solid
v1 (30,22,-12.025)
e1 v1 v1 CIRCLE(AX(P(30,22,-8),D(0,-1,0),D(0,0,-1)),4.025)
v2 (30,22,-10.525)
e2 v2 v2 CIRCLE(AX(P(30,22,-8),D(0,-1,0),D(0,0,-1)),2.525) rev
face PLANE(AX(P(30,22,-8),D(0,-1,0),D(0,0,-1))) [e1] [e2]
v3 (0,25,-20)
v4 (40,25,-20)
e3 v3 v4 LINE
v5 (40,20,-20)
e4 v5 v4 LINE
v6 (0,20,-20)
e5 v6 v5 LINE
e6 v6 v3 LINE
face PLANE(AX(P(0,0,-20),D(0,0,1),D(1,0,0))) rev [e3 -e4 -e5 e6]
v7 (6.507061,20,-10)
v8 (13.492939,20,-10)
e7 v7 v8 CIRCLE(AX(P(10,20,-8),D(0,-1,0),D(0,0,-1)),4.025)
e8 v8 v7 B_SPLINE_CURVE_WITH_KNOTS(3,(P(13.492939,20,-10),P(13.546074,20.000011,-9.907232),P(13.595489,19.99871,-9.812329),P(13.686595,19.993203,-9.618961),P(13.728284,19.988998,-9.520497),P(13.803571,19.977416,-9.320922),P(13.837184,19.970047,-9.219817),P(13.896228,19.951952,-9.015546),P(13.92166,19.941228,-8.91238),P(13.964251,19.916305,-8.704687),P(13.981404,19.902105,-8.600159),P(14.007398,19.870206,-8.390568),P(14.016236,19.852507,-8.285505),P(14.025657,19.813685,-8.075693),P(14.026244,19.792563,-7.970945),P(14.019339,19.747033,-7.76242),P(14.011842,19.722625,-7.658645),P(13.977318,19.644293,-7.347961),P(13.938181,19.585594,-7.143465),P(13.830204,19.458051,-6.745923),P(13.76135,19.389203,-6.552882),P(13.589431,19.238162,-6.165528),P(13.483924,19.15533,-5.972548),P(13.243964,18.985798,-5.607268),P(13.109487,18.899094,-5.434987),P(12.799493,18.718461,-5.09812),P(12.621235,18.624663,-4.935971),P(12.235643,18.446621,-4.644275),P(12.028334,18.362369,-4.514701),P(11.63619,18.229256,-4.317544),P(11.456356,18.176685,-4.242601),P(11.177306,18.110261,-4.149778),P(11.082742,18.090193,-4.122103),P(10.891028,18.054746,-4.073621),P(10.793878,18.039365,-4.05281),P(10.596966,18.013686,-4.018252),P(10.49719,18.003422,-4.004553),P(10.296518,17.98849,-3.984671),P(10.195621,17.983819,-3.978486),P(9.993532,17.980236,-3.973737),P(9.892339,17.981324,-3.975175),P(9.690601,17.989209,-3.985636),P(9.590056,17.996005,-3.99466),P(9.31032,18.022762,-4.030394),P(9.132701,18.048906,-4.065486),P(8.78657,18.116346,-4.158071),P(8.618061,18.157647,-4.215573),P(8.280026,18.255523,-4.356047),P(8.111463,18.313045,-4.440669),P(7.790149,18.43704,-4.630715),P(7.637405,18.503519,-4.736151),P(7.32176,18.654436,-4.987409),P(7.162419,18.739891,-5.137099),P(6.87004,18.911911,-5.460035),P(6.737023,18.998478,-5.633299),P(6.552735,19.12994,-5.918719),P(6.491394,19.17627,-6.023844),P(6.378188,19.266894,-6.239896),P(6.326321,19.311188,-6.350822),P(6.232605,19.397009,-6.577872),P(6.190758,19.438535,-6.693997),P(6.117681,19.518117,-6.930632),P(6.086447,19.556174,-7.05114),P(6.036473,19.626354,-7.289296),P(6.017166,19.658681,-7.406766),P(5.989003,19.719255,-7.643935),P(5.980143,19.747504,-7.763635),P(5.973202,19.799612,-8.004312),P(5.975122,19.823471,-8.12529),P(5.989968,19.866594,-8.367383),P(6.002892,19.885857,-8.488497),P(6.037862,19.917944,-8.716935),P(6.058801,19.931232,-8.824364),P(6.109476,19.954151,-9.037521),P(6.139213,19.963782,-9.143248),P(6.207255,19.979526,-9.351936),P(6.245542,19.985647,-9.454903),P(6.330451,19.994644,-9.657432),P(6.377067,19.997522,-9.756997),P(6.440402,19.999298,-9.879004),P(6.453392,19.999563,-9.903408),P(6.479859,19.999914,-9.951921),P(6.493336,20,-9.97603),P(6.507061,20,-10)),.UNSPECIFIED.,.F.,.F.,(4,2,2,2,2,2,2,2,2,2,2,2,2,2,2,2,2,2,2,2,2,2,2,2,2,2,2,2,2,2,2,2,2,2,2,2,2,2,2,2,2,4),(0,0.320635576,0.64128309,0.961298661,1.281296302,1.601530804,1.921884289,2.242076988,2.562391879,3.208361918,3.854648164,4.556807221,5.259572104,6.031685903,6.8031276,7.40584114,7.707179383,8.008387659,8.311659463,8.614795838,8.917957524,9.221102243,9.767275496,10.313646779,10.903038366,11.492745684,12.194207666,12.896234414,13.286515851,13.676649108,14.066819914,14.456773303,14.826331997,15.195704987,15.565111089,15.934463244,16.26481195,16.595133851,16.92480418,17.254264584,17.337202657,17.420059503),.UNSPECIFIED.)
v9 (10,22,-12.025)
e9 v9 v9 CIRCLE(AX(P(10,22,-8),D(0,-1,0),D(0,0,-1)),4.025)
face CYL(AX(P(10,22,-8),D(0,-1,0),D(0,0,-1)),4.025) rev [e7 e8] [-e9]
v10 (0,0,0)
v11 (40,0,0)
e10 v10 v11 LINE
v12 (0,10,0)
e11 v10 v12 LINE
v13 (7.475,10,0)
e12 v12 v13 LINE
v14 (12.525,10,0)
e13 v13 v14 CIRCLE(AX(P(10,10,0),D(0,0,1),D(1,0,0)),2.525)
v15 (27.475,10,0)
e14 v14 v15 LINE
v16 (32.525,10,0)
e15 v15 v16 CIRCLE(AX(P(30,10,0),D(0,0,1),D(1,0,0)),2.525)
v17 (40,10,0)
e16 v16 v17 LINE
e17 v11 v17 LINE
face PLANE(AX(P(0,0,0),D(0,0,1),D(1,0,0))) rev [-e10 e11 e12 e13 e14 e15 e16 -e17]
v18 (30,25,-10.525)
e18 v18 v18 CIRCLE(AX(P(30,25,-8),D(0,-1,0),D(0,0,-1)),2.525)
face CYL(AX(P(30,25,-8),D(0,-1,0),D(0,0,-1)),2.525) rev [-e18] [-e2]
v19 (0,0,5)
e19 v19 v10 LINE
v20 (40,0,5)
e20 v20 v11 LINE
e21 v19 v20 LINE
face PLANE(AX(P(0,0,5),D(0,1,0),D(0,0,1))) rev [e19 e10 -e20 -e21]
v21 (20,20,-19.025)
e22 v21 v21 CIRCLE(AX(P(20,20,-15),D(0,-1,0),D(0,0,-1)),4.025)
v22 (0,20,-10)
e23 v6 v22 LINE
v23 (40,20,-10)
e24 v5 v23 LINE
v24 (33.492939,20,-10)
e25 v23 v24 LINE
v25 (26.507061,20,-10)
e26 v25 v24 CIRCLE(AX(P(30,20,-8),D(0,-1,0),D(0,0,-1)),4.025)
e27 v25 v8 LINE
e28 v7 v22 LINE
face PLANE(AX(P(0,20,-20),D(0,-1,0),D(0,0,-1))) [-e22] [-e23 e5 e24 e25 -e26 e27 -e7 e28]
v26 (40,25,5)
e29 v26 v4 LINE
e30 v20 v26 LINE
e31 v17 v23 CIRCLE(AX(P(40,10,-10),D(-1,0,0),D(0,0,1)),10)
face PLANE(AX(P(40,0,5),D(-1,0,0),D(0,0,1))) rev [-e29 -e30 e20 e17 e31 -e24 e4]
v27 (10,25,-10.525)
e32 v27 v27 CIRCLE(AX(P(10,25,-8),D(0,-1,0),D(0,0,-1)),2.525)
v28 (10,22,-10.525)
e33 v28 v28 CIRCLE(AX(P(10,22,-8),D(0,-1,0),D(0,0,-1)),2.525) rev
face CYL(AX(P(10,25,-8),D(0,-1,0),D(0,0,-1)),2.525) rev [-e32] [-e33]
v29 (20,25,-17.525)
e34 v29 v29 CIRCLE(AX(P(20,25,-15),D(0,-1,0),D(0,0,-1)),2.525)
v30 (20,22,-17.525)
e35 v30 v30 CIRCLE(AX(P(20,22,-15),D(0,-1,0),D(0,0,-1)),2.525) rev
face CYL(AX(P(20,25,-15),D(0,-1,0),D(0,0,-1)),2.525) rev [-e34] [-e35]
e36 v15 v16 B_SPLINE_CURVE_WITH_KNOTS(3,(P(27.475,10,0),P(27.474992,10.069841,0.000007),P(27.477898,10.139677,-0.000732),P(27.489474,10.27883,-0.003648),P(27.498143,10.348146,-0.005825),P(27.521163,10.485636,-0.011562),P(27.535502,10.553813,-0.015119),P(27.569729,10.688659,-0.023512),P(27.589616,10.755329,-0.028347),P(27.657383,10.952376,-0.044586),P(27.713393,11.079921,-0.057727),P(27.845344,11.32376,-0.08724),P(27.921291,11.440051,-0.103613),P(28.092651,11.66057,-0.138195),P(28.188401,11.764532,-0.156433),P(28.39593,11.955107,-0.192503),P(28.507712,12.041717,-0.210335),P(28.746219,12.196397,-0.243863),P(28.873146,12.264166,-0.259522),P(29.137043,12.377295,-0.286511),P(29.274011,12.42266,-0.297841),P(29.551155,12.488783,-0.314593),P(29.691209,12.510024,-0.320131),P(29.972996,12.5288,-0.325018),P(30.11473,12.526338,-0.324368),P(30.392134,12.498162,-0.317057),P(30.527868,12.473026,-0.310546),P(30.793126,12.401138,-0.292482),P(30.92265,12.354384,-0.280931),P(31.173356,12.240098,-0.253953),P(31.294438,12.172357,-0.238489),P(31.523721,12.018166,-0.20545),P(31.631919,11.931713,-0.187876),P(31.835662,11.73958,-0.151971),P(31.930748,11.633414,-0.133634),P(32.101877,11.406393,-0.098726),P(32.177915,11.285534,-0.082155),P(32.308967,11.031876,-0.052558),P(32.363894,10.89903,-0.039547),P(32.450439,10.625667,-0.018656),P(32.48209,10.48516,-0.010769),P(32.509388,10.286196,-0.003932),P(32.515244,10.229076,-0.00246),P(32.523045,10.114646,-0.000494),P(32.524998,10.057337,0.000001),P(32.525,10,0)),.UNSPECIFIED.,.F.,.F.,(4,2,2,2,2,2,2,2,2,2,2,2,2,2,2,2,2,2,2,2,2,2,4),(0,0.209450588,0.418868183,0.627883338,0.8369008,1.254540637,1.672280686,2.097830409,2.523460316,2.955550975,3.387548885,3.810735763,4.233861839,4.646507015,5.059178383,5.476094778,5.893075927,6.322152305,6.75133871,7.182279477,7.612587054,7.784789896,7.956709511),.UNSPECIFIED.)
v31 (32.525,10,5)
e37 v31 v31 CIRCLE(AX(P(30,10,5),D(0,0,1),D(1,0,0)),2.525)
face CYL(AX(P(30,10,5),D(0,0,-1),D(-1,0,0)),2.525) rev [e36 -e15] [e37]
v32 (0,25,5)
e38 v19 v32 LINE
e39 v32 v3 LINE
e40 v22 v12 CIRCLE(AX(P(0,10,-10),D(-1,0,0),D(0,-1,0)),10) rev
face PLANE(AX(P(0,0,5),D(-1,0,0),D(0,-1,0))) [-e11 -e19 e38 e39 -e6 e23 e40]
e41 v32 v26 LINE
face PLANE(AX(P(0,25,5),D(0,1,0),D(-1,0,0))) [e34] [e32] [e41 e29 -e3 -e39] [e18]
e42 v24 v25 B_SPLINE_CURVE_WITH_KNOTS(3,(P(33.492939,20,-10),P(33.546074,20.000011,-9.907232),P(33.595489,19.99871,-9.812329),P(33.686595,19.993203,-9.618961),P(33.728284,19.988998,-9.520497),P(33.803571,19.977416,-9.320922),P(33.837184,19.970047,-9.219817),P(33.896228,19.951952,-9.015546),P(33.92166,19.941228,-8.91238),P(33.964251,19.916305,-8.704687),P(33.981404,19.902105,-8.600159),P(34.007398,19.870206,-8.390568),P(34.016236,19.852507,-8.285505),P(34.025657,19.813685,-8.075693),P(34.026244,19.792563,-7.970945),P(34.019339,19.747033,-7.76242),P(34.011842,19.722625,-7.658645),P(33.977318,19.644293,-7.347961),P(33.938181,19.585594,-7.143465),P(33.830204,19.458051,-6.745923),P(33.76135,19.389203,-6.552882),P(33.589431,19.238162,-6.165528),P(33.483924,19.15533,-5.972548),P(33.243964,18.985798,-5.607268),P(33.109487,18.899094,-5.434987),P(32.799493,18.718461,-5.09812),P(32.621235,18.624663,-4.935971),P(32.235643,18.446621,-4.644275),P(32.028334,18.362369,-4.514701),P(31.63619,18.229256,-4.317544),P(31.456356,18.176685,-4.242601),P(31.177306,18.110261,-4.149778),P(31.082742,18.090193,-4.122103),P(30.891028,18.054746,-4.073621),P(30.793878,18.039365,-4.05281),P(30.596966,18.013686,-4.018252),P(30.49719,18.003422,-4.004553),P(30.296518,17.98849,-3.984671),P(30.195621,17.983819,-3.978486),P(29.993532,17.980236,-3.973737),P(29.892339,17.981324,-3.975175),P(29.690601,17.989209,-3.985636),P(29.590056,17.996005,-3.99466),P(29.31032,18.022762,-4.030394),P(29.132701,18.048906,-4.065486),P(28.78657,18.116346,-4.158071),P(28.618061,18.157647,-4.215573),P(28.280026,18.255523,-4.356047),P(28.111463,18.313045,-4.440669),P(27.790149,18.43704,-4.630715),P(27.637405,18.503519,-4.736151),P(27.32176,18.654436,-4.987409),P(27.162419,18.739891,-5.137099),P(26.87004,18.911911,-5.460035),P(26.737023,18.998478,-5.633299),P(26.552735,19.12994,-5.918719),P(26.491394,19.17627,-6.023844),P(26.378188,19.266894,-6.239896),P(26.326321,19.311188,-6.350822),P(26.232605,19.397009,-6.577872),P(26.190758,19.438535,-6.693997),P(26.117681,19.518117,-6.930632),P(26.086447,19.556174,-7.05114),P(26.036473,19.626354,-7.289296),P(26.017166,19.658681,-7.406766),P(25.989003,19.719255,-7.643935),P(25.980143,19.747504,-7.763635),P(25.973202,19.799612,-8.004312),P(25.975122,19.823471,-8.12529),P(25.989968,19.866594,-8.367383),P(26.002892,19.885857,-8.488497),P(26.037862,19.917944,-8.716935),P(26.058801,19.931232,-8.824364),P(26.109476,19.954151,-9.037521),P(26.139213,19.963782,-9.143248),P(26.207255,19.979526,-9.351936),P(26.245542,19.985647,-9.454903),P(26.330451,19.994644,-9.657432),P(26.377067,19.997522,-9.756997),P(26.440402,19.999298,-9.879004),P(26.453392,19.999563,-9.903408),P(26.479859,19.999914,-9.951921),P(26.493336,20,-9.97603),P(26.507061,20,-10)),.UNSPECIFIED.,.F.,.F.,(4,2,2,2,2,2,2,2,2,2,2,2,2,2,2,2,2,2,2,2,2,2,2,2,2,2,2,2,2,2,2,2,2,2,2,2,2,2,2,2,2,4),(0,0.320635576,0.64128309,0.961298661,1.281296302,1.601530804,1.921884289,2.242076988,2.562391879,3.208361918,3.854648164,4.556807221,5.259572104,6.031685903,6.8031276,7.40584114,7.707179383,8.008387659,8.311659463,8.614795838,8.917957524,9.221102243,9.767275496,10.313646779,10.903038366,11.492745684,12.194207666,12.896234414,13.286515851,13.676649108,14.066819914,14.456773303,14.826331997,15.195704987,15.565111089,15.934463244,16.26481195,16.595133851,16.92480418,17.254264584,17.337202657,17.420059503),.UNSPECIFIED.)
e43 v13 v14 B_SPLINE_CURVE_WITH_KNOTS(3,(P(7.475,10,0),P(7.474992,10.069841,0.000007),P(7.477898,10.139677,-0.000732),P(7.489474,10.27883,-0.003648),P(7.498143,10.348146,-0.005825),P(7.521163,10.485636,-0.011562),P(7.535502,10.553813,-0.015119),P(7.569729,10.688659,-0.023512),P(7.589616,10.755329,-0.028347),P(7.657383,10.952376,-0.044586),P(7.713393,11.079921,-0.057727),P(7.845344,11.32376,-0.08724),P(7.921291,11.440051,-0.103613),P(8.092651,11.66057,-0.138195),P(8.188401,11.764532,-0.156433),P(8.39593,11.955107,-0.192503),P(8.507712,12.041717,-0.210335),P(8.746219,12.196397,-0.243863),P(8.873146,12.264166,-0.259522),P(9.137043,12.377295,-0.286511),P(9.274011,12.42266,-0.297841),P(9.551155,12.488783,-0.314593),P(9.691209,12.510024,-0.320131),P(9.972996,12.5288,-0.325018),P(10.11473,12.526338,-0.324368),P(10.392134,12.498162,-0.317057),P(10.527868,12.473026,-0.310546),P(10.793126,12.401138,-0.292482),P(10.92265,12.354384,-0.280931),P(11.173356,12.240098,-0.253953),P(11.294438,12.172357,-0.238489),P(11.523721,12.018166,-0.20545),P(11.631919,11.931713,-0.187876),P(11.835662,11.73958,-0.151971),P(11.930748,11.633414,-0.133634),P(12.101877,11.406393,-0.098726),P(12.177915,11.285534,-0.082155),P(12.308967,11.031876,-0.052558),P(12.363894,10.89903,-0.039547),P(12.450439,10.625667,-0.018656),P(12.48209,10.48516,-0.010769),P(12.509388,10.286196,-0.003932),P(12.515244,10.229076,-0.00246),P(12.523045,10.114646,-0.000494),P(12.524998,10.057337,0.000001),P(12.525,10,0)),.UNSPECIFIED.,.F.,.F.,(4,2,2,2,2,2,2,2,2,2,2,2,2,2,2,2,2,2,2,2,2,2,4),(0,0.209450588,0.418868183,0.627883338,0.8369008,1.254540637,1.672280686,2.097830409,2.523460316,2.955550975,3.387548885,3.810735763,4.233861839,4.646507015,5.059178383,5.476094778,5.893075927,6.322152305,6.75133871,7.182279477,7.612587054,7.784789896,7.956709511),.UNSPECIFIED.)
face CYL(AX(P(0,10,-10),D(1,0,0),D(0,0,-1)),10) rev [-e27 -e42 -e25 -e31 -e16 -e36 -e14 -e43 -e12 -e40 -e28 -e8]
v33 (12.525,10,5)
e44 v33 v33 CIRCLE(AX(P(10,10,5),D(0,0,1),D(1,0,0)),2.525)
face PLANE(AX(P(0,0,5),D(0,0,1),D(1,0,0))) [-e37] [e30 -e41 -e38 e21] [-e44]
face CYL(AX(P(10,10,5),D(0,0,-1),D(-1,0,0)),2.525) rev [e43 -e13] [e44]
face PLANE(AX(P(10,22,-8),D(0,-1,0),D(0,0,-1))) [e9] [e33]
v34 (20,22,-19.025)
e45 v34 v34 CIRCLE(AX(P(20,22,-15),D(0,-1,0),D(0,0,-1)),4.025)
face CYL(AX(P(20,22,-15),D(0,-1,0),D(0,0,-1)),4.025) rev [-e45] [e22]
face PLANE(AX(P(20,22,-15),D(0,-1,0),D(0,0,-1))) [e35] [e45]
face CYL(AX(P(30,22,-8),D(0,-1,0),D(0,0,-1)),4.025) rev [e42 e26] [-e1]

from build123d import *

# Parameters (mm, degrees)
CROQUIS1_W              = 40
CROQUIS1_H              = 20
CROQUIS1_R              = 2.525
CROQUIS1_H_2            = 5
SALIENTE_EXTRUIR1_DEPTH = 5
CROQUIS1_3_W            = 40
CROQUIS1_3_H            = 5
SALIENTE_EXTRUIR2_DEPTH = 20
CROQUIS2_R              = 2.525
CORTAR_EXTRUIR1_DEPTH   = 49.989794856
CROQUIS4_R              = 4.025
CORTAR_EXTRUIR2_DEPTH   = 2
REDONDEO1_R             = 10


with BuildPart() as part:
    # Croquis1 → Saliente-Extruir1 (new body)
    # profile 1 of 2: a face of its own
    with BuildSketch(Plane.XY):
        with Locations((20, 10)):
            Rectangle(CROQUIS1_W, CROQUIS1_H)
        with Locations((10, 10)):
            Circle(CROQUIS1_R, mode=Mode.SUBTRACT)
        with Locations((30, 10)):
            Circle(CROQUIS1_R, mode=Mode.SUBTRACT)
    # profile 2 of 2: a face of its own
    with BuildSketch(Plane.XY):
        with Locations((20, 22.5)):
            Rectangle(CROQUIS1_W, CROQUIS1_H_2)
    extrude(amount=SALIENTE_EXTRUIR1_DEPTH)

    # Croquis1<3> → Saliente-Extruir2 (add)
    with BuildSketch(Plane.XY):
        with Locations((20, 22.5)):
            Rectangle(CROQUIS1_3_W, CROQUIS1_3_H)
    extrude(amount=-SALIENTE_EXTRUIR2_DEPTH)

    # Croquis2 → Cortar-Extruir1 (cut, through all)
    with BuildSketch(Plane.XZ.offset(-20)):
        with Locations(Location((10, -8, 0), (0, 0, 270))):
            Circle(CROQUIS2_R)
        with Locations(Location((30, -8, 0), (0, 0, 270))):
            Circle(CROQUIS2_R)
        with Locations(Location((20, -15, 0), (0, 0, 270))):
            Circle(CROQUIS2_R)
    extrude(amount=-CORTAR_EXTRUIR1_DEPTH, mode=Mode.SUBTRACT)

    # Croquis4 → Cortar-Extruir2 (cut)
    with BuildSketch(Plane.XZ.offset(-20)):
        with Locations(Location((10, -8, 0), (0, 0, 270))):
            Circle(CROQUIS4_R)
        with Locations(Location((20, -15, 0), (0, 0, 270))):
            Circle(CROQUIS4_R)
        with Locations(Location((30, -8, 0), (0, 0, 270))):
            Circle(CROQUIS4_R)
    extrude(amount=-CORTAR_EXTRUIR2_DEPTH, mode=Mode.SUBTRACT)

    # Redondeo1
    # the kernel refuses this fillet: 10 mm, written as the material it adds along each edge
    with BuildSketch(Plane(origin=(0, 20, 0), x_dir=(0, -1, 0), z_dir=(1, 0, 0))) as redondeo1_piece_1_section:
        with BuildLine():
            CenterArc((REDONDEO1_R, REDONDEO1_R), REDONDEO1_R, 180, 90)
            Line((0, REDONDEO1_R), (0, 0))
            Line((0, 0), (REDONDEO1_R, 0))
        make_face()
    redondeo1_piece_1 = extrude(amount=40, mode=Mode.PRIVATE)
    redondeo1_piece_1 = redondeo1_piece_1 - Plane(origin=(10, 10, -2.034462618), x_dir=(1, 0, 0), z_dir=(0, 0, -1)) * Cylinder(2.525, 120, mode=Mode.PRIVATE)
    redondeo1_piece_1 = redondeo1_piece_1 - Plane(origin=(30, 10, -2.034462618), x_dir=(1, 0, 0), z_dir=(0, 0, -1)) * Cylinder(2.525, 120, mode=Mode.PRIVATE)
    redondeo1_piece_1 = redondeo1_piece_1 - Plane(origin=(10, 17.656034645, -8), x_dir=(0, 0, -1), z_dir=(0, -1, 0)) * Cylinder(4.025, 120, mode=Mode.PRIVATE)
    redondeo1_piece_1 = redondeo1_piece_1 - Plane(origin=(30, 17.656034645, -8), x_dir=(0, 0, -1), z_dir=(0, -1, 0)) * Cylinder(4.025, 120, mode=Mode.PRIVATE)
    add(redondeo1_piece_1)


solid = part.part
